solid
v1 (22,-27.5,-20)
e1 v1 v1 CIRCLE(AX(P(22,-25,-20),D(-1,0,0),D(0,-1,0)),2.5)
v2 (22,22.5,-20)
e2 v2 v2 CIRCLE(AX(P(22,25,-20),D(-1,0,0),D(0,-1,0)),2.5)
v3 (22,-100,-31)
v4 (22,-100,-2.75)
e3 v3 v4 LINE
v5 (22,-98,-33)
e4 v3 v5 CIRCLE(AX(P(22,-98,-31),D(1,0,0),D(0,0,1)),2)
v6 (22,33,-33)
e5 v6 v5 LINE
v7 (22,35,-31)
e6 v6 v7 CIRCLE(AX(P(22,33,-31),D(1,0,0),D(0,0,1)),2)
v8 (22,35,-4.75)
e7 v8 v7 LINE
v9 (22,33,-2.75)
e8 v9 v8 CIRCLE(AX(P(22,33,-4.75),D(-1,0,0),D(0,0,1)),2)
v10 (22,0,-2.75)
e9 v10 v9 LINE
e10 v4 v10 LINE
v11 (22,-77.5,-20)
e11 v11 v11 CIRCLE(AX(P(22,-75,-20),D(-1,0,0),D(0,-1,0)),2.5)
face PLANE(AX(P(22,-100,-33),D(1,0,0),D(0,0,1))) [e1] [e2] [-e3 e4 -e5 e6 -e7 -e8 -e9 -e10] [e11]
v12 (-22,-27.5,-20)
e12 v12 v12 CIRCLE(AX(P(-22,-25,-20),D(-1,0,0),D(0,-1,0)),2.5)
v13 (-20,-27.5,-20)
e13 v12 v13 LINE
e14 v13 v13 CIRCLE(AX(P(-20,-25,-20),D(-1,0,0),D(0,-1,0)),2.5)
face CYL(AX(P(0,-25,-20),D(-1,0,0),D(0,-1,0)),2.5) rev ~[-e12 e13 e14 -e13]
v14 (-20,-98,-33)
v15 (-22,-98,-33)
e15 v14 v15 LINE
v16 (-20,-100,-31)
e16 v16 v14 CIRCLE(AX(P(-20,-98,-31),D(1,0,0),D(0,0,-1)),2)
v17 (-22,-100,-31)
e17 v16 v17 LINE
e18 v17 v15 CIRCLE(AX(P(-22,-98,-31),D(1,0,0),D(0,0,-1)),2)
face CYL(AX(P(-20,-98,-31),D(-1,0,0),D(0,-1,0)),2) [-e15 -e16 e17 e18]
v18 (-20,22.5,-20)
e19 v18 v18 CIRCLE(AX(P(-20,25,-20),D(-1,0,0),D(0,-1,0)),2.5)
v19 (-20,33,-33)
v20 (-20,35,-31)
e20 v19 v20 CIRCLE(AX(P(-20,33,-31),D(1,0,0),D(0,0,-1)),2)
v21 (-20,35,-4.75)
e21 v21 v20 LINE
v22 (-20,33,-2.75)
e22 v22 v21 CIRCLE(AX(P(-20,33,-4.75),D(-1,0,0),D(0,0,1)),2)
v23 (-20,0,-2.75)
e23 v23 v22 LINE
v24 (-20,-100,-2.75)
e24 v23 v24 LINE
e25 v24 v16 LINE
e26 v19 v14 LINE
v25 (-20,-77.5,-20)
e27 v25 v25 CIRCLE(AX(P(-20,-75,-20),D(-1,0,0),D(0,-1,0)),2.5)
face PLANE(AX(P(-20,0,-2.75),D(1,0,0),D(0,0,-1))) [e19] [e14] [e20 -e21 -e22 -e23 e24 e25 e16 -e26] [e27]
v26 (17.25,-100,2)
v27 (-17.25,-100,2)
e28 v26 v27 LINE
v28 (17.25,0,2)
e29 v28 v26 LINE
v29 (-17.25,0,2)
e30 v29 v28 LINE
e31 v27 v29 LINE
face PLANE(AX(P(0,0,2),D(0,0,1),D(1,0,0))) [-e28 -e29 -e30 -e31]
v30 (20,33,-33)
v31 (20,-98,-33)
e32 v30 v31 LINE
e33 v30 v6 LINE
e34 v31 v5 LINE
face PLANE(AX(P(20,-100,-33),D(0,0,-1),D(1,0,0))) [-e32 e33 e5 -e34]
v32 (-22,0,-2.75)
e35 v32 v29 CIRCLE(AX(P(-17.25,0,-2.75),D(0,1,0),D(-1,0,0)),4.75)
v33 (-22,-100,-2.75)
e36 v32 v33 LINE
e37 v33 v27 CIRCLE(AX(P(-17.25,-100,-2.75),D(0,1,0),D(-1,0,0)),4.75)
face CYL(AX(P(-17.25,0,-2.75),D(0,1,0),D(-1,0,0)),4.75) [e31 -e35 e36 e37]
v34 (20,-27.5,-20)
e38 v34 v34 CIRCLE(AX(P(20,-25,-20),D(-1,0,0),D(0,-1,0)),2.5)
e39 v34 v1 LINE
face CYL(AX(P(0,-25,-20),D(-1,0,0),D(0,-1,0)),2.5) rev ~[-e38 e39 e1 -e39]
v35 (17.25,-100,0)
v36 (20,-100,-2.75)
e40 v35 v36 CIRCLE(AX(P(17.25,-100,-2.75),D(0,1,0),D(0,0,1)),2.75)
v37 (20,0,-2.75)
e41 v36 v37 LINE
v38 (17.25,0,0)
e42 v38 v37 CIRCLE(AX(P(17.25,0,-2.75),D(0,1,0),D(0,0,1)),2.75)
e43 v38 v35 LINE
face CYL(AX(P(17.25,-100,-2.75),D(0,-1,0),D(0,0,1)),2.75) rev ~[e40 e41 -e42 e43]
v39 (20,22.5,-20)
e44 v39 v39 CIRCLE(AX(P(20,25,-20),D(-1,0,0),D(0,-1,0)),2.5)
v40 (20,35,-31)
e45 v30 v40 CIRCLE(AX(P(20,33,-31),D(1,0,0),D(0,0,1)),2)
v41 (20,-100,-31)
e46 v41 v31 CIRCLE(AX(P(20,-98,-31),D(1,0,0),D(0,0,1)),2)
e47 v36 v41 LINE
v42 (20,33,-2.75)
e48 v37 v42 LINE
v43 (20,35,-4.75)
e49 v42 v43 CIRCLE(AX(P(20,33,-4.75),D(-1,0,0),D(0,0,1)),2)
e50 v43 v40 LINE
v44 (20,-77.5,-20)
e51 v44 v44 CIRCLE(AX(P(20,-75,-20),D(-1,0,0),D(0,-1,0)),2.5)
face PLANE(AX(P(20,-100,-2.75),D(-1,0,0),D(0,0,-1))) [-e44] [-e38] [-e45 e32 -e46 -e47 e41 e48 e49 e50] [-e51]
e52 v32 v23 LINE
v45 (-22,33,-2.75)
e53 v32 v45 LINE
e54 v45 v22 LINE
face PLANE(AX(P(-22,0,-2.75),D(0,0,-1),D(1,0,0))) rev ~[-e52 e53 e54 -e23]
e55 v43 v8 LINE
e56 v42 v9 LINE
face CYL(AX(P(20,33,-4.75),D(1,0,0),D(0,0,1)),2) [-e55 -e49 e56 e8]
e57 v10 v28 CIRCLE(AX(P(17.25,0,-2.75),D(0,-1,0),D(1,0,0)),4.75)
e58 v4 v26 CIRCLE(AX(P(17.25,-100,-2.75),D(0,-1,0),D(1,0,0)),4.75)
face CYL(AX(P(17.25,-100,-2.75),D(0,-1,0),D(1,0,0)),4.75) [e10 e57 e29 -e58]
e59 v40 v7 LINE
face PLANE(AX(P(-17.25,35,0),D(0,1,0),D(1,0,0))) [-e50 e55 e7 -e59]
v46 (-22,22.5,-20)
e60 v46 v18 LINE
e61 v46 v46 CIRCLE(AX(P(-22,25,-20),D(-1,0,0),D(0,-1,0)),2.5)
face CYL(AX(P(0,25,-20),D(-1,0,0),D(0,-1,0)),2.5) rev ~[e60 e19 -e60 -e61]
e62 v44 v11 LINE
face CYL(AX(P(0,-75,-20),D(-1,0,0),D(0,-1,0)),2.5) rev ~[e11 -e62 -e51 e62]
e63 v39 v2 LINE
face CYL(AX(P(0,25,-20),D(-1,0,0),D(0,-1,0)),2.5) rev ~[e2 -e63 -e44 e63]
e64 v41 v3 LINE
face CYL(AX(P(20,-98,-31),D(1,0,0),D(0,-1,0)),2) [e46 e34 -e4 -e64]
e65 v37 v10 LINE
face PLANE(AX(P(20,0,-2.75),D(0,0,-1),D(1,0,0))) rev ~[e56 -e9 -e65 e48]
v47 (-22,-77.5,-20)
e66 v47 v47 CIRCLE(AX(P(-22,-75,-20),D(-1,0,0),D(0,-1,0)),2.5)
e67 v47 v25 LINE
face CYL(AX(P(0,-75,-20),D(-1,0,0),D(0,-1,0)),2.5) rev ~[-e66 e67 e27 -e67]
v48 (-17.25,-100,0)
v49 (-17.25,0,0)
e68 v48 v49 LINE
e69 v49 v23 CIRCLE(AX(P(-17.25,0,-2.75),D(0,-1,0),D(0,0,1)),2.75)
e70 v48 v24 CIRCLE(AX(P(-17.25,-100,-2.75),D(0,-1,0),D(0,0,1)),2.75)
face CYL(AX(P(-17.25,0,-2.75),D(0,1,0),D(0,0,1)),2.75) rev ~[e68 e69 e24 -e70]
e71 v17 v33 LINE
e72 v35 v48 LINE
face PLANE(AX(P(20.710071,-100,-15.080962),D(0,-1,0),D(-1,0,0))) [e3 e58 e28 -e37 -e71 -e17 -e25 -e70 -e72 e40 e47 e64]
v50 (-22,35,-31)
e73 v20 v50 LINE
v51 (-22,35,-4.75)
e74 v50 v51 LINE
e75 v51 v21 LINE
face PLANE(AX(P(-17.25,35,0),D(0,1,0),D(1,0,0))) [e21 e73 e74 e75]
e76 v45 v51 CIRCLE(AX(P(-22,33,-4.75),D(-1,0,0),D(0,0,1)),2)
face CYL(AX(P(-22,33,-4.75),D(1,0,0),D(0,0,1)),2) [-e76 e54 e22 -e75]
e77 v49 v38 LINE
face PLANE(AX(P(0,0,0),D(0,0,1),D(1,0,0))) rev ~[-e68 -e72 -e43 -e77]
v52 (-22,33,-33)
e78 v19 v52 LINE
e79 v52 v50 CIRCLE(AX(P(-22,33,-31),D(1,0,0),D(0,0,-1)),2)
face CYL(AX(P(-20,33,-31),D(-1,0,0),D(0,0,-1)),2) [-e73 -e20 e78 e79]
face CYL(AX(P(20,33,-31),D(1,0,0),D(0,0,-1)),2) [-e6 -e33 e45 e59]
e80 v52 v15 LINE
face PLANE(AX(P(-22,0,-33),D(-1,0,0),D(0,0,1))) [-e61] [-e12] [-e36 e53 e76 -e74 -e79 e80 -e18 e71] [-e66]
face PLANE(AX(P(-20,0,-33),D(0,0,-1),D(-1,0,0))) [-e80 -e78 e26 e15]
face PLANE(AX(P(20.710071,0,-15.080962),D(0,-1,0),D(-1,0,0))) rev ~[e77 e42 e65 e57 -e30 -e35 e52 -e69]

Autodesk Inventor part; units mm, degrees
ref_plane "YZ Plane" through (0, 0, 0) normal (1, 0, 0) x (0, 1, 0)
ref_plane "XZ Plane" through (0, 0, 0) normal (0, 1, 0) x (-1, 0, 0)
ref_plane "XY Plane" through (0, 0, 0) normal (0, 0, 1) x (1, 0, 0)
sketch "Sketch1" plane through (0, 0, 0) normal (0, 0, 1) x (1, 0, 0)
  line L0 (-20, 0) -> (20, 0)
  line L1 (20, 0) -> (20, -100)
  line L2 (20, -100) -> (-20, -100)
  line L3 (-20, -100) -> (-20, 0)
  point P0 (0, 0)
  point P1 (0, 0)
  dimension "d0" = 40
  dimension "d1" = 100
extrude "Plate1" add sketch "Sketch1" along normal blind 2
sketch "Sketch2" plane through (20, -100, 0) normal (1, 0, 0) x (0, 1, 0)
  line L0 (100, 0) -> (0, 0)
  line L1 (0, 0) -> (0, -33)
  line L2 (0, -33) -> (100, -33)
  line L3 (100, -33) -> (100, 0)
edge flange "Flange1" height 35 angle 90 thickness 2 bend radius 2.75 thickness toward (1, 0, 0) relief round relief width 2 relief depth 1 corner gap 2.75 corner form 0 edges at (20, -50, 0) (-20, -50, 0) wall of the first edge with corners at (20, 0, 0) (20, -100, 0) (20, -100, -33) (20, 0, -33)
bend "Bend1"
corner "Corner1"
sketch "Sketch5" plane through (-17.25, 0, 0) normal (0, 1, 0) x (1, 0, 0)
  line L0 (-4.75, 2.75) -> (-2.75, 2.75) projected
  line L1 (-2.75, 2.75) -> (-2.75, 33) projected
  line L2 (-2.75, 33) -> (-4.75, 33) projected
  line L3 (-4.75, 33) -> (-4.75, 2.75) projected
  line L4 (37.25, 2.75) -> (39.25, 2.75) projected
  line L5 (39.25, 2.75) -> (39.25, 33) projected
  line L6 (37.25, 33) -> (39.25, 33) projected
  line L7 (37.25, 2.75) -> (37.25, 33) projected
  point P0 (17.25, 0)
extrude "Extrusion2" add sketch "Sketch5" along normal blind 35
sketch "Sketch3" plane through (0, 0, 0) normal (1, 0, 0) x (0, 1, 0)
  line L0 (0, -33) -> (-100, -33) projected
  line L1 (-75, -20) -> (-75, -20) construction
  line L2 (-77.5, -20) -> (-77.5, -20)
  line L3 (-72.5, -20) -> (-72.5, -20)
  arc A0 (-72.5, -20) -> (-77.5, -20) centre (-75, -20) ccw
  arc A1 (-77.5, -20) -> (-72.5, -20) centre (-75, -20) ccw
  line L4 (-100, -2.75) -> (-100, -33) projected
  point P0 (0, 0)
  dimension "d14" = 0
  dimension "d15" = 13
  dimension "d17" = 2.5
  dimension "d18" = 25
extrude "Extrusion1" cut sketch "Sketch3" along normal through all both and the other way through all
pattern_linear "Rectangular Pattern1" count 3 spacing 50 along (0, 1, 0) of "Extrusion1"
fillet "Fillet1" radius 2 6 edges at (21, 35, -2.75) (-21, 35, -2.75) (-21, 35, -33) (21, 35, -33) (21, -100, -33) (-21, -100, -33)
equation "\"d2\" = Thickness"
equation "\"d3\" = BendReliefWidth"
equation "\"d4\" = BendReliefDepth"
equation "\"d5\" = MinimumRemnant"
equation "\"d6\" = TransitionRadius"
equation "\"d9\" = BendRadius"
equation "\"d10\" = CornerReliefSize"
equation "\"d11\" = GapSize"
equation "\"d12\" = JacobiRadiusSize"
equation "\"BendReliefWidth\" = Thickness"
equation "\"BendReliefDepth\" = 0.5 * Thickness"
equation "\"CornerReliefSize\" = 4 * Thickness"
equation "\"MinimumRemnant\" = 2 * Thickness"
equation "\"TransitionRadius\" = BendRadius"
equation "\"JacobiRadiusSize\" = BendRadius"
equation "\"GapSize\" = Thickness"
equation "\"Thickness\" = 2"
equation "\"BendRadius\" = 2.75"
properties part number "NDM 4.0.8 bracket1" material "Stainless Steel"
